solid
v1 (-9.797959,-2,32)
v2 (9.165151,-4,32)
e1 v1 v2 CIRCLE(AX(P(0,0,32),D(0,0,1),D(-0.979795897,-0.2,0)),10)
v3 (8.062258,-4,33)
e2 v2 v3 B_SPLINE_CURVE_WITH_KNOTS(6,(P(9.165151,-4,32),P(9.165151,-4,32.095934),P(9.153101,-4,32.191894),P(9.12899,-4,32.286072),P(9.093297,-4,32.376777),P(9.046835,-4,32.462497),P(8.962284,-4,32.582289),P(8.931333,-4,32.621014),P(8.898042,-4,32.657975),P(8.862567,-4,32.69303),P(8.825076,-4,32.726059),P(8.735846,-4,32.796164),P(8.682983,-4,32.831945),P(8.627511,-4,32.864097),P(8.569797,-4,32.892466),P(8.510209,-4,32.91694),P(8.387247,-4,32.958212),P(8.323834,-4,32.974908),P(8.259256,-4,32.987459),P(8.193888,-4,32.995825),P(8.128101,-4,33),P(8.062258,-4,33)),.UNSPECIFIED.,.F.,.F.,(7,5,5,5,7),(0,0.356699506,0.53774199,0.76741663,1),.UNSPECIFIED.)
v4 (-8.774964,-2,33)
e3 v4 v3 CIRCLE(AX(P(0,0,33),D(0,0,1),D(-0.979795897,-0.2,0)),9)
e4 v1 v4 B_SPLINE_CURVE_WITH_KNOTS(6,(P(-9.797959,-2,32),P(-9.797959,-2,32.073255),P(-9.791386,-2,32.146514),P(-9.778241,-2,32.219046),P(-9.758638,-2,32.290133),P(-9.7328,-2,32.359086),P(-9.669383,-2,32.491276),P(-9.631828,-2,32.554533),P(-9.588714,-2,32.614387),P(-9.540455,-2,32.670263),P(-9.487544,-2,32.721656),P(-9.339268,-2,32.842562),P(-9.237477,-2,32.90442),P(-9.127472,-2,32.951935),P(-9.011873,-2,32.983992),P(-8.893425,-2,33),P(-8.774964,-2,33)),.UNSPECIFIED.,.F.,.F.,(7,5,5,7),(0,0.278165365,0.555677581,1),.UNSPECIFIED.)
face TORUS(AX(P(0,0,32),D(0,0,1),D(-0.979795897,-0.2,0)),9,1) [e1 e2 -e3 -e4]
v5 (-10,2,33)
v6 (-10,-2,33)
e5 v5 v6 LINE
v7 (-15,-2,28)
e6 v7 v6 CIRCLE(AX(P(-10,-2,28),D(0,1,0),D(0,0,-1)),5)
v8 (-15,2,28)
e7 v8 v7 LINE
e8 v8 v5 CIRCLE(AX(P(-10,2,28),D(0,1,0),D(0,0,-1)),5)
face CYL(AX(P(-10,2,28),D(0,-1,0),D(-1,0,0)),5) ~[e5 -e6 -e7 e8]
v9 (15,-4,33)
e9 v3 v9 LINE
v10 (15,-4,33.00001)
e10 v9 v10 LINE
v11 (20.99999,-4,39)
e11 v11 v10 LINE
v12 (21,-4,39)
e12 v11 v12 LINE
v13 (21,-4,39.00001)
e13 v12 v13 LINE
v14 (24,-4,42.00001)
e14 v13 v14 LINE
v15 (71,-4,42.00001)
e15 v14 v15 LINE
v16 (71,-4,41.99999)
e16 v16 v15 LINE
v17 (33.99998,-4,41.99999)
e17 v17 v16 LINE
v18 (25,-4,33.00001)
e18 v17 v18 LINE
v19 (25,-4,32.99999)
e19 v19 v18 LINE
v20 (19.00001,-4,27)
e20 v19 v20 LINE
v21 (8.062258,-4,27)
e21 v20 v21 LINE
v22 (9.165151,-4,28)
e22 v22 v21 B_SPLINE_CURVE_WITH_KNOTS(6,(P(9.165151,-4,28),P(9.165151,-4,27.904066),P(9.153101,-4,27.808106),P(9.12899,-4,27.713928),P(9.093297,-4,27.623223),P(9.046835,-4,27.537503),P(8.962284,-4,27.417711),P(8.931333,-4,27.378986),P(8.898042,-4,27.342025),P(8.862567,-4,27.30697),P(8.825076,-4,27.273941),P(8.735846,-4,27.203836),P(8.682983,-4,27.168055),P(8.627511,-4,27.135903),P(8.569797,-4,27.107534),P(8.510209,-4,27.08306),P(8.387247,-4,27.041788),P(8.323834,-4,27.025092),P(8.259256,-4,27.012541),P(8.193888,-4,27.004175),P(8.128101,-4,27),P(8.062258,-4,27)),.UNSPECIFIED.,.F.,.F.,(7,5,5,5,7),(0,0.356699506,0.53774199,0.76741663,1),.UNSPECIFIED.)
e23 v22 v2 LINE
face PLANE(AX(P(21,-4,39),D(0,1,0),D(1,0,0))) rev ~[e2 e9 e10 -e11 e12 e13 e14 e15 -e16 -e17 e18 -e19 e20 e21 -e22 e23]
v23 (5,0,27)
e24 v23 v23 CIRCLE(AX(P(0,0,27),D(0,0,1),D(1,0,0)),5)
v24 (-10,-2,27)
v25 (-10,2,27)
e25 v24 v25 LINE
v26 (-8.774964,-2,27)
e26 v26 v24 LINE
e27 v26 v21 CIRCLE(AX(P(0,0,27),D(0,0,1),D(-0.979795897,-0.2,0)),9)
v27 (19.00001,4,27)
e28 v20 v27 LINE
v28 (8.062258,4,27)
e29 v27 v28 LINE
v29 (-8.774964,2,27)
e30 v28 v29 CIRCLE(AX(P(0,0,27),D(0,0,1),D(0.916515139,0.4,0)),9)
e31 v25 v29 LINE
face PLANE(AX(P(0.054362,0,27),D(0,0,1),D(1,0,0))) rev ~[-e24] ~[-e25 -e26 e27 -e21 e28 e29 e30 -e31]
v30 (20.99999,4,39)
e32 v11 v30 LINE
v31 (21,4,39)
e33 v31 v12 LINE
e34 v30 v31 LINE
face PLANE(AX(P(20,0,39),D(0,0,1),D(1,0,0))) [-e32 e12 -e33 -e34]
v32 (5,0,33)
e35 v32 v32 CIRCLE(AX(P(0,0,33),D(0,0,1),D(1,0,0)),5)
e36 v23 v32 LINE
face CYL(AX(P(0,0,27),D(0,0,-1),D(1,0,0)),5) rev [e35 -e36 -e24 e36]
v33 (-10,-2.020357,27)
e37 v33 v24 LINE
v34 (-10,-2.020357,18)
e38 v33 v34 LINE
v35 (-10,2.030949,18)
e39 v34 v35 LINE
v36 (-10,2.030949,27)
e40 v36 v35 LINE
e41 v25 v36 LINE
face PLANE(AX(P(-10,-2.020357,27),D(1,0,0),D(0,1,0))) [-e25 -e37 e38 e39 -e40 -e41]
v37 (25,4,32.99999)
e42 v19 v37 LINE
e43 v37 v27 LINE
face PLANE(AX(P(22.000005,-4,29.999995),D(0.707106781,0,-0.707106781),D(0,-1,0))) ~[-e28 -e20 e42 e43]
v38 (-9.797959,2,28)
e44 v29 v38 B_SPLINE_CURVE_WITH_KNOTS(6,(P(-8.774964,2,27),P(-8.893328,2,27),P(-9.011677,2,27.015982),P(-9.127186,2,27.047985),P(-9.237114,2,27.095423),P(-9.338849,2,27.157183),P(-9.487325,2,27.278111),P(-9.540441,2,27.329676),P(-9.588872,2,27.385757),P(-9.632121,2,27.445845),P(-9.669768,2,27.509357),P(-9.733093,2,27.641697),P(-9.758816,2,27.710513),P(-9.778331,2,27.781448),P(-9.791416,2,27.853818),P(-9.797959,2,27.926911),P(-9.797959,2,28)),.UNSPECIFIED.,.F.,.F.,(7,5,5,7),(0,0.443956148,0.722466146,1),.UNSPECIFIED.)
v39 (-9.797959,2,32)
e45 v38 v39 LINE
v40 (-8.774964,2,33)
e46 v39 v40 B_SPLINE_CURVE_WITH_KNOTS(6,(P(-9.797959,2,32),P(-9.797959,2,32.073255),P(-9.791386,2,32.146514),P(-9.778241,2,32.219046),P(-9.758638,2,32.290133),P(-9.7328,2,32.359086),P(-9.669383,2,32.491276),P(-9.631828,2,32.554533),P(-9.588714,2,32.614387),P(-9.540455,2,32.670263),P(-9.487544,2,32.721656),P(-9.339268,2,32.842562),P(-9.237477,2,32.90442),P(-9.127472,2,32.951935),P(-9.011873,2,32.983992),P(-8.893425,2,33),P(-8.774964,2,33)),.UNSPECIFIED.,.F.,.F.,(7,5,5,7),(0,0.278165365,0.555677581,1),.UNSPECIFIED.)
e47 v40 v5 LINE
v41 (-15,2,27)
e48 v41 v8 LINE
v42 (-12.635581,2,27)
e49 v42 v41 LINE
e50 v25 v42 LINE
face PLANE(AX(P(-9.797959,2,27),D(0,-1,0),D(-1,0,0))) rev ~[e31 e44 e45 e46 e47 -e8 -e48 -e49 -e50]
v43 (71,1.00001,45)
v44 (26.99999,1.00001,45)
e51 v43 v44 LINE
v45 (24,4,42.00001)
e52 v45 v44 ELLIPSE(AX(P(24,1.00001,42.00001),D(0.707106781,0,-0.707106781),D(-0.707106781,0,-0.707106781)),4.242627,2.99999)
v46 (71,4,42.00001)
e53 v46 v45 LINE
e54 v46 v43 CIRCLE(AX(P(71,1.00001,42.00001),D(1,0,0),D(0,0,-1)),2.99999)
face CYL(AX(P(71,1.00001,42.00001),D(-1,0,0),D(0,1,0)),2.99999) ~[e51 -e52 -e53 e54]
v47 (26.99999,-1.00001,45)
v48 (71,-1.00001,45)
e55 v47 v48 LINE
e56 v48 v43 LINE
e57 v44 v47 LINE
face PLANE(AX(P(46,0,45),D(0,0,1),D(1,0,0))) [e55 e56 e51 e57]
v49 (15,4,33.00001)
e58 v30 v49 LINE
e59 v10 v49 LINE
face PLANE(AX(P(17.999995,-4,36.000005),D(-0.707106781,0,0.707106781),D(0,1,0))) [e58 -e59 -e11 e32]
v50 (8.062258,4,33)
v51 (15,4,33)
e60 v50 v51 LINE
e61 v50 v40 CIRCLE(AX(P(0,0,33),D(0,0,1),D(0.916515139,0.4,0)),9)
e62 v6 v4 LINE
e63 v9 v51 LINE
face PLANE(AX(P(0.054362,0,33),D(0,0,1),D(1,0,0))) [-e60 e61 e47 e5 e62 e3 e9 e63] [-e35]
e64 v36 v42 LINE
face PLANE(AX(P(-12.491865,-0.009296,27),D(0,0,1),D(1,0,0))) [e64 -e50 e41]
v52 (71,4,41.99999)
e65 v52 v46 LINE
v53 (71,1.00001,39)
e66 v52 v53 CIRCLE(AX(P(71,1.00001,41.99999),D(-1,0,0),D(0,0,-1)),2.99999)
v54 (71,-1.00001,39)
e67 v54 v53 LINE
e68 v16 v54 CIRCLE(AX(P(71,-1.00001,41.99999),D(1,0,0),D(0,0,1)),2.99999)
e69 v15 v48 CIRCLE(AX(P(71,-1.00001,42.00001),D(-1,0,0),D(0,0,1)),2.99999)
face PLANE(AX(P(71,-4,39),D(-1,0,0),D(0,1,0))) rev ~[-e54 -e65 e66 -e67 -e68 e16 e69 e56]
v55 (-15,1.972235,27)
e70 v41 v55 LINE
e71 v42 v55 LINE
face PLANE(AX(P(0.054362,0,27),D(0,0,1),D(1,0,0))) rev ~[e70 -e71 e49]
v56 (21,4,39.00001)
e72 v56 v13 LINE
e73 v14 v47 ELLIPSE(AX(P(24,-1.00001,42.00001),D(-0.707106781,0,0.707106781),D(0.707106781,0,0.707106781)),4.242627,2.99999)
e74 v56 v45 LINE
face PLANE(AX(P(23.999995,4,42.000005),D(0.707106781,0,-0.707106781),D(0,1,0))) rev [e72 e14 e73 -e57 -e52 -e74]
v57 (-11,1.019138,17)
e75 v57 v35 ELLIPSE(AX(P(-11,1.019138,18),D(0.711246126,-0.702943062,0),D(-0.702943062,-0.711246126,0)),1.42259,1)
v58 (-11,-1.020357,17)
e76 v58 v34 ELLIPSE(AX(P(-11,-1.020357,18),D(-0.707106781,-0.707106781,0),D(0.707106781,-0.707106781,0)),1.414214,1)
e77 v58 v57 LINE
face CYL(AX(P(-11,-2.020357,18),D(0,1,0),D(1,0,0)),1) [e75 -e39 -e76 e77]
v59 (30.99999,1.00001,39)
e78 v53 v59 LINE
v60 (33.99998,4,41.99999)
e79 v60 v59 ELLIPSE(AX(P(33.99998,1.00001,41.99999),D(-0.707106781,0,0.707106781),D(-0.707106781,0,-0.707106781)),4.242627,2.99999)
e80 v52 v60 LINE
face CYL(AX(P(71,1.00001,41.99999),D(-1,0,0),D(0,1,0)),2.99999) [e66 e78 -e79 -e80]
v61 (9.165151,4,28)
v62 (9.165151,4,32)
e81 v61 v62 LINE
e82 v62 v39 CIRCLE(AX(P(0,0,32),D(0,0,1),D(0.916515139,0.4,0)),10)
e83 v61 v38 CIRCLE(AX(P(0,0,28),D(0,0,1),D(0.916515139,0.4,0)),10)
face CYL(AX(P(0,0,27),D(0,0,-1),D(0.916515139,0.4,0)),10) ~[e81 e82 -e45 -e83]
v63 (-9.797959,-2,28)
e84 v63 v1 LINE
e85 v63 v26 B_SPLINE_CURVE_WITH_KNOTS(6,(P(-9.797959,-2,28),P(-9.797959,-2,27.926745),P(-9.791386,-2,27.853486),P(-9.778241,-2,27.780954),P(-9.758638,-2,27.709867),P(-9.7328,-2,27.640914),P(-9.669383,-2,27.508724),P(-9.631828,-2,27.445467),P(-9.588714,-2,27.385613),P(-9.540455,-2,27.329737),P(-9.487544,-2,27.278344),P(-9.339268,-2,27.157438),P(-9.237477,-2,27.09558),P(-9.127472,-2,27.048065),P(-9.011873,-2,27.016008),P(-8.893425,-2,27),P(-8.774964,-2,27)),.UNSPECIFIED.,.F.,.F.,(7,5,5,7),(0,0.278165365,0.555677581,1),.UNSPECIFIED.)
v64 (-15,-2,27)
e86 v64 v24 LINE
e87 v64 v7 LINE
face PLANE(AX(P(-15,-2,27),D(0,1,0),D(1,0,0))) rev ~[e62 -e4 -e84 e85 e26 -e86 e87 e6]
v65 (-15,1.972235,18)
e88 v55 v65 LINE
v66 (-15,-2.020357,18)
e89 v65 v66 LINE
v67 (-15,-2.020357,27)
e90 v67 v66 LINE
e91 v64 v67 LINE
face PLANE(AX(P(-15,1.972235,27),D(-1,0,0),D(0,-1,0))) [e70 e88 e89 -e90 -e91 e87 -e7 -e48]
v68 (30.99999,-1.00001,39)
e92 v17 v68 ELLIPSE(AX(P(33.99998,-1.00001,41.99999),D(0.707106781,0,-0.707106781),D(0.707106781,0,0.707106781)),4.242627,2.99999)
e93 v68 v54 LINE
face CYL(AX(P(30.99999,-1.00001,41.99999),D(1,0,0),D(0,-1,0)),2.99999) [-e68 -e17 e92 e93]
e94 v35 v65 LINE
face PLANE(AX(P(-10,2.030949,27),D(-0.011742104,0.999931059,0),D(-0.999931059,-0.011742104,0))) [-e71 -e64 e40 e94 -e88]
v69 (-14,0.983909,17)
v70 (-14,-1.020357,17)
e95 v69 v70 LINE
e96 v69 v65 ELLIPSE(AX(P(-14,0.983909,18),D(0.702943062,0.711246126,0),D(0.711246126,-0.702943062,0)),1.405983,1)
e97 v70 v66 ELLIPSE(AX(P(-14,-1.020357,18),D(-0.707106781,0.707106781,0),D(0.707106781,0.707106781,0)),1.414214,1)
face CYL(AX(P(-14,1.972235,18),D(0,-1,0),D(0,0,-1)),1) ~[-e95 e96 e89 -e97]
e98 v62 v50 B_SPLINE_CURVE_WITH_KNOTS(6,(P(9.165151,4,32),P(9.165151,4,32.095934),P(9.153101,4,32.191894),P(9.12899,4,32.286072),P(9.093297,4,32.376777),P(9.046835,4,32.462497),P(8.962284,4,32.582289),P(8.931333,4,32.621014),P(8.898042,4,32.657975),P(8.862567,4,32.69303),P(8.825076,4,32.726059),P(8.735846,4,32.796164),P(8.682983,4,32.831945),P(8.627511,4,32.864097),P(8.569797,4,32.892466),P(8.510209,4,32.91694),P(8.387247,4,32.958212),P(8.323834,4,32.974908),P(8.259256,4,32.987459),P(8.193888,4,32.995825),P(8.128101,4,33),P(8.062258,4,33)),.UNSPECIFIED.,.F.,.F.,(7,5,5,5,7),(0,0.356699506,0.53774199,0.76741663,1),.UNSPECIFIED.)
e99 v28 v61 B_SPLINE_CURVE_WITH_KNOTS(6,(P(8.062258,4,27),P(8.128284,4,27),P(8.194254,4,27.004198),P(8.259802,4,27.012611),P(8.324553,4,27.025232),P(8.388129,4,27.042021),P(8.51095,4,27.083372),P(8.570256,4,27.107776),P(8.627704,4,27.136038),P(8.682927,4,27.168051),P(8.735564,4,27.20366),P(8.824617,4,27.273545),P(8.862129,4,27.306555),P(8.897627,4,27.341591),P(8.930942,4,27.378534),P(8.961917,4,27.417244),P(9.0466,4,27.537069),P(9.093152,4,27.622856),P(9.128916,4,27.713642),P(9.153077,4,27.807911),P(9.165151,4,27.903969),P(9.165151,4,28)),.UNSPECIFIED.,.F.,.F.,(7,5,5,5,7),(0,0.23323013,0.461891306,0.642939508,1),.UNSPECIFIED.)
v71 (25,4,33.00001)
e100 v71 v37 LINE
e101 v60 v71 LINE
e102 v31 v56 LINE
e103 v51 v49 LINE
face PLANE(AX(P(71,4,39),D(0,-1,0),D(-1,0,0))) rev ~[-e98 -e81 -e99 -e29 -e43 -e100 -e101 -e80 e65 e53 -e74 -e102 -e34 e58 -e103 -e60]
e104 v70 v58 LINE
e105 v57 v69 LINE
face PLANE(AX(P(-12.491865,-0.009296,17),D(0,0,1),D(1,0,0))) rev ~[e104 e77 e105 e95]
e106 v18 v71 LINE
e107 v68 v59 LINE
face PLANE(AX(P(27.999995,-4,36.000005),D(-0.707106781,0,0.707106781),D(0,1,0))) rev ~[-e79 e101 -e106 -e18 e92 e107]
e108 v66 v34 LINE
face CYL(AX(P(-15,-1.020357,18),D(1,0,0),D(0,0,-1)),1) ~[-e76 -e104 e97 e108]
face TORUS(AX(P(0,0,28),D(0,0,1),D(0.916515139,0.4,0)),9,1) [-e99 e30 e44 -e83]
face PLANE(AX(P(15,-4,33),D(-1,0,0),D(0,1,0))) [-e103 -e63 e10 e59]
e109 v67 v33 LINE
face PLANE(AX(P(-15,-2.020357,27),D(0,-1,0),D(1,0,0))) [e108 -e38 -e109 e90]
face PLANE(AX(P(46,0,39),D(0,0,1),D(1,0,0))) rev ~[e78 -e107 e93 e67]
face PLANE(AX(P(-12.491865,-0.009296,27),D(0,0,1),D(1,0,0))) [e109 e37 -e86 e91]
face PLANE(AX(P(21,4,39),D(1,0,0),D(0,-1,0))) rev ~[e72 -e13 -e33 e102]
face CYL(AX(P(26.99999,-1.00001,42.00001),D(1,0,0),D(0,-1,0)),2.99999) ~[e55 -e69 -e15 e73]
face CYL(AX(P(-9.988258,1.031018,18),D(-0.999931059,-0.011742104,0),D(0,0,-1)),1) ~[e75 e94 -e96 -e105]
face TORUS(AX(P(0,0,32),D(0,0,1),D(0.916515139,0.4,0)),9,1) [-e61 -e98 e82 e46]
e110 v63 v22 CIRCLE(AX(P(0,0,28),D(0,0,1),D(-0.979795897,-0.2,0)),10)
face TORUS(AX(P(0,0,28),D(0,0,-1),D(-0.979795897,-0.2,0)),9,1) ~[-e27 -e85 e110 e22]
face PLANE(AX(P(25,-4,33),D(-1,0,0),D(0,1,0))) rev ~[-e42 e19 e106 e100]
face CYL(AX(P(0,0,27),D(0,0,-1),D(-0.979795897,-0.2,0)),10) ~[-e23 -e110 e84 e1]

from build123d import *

# Parameters (mm, degrees)
F1_R     = 5
F2_DEPTH = 6
F4_DEPTH = 10
F5_R     = 5
F6_W     = 10
F6_H     = 8
F7_DEPTH = 6
F9_DEPTH = 6
F10_SIZE = 5.99999
F11_R    = 2.99999
F12_R    = 1
F13_R    = 1


# Not quite as in the source:
# - a fillet or chamfer is up to 0.001 mm smaller than in the source, because OpenCascade refuses the exact size


with BuildPart() as f2:
    # F1 (on offset) → F2 (new body)
    with BuildSketch(Plane.XY.offset(27)):
        with BuildLine():
            ThreePointArc((9.1651513899, -4), (9.7890631293, -2.0430964369), (10, 0))
            ThreePointArc((10, 0), (9.7890631293, 2.0430964369), (9.1651513899, 4))
            ThreePointArc((9.1651513899, 4), (-1.048861935, 9.9448423135), (-9.7979589711, 2))
            ThreePointArc((-9.7979589711, 2), (-9.9493615301, 1.0050896201), (-10, 0))
            ThreePointArc((-10, 0), (-9.9493615301, -1.0050896201), (-9.7979589711, -2))
            ThreePointArc((-9.7979589711, -2), (-1.048861935, -9.9448423135), (9.1651513899, -4))
        make_face()
        Circle(F1_R, mode=Mode.SUBTRACT)
        with BuildLine():
            Line((25, 0), (10, 0))
            ThreePointArc((10, 0), (9.7890631293, -2.0430964369), (9.1651513899, -4))
            Line((9.1651513899, -4), (25, -4))
            Line((25, -4), (25, 0))
        make_face()
        with BuildLine():
            ThreePointArc((9.1651513899, 4), (9.7890631293, 2.0430964369), (10, 0))
            Line((10, 0), (25, 0))
            Line((25, 0), (25, 4))
            Line((25, 4), (9.1651513899, 4))
        make_face()
        with BuildLine():
            ThreePointArc((-10, 0), (-9.9493615301, 1.0050896201), (-9.7979589711, 2))
            Line((-9.7979589711, 2), (-15, 2))
            Line((-15, 2), (-15, 0))
            Line((-15, 0), (-10, 0))
        make_face()
        with BuildLine():
            Line((-15, -2), (-9.7979589711, -2))
            ThreePointArc((-9.7979589711, -2), (-9.9493615301, -1.0050896201), (-10, 0))
            Line((-10, 0), (-15, 0))
            Line((-15, 0), (-15, -2))
        make_face()
    extrude(amount=F2_DEPTH)

    # F3 (on offset) → F4 (join)
    with BuildSketch(Plane.XY.offset(27)):
        Polygon((-10, -2.0203573131), (-10, 2.0309494015), (-15, 1.9722348321), (-15, -2.0203573131), align=None)
    extrude(amount=-F4_DEPTH)

    # F5
    f5_edges = [f2.edges().sort_by_distance(p)[0] for p in [
        (-15, 0, 33),
    ]]
    fillet(f5_edges, radius=F5_R)

    # F6 (on face) → F7 (join)
    with BuildSketch(Plane.XY.offset(33)):
        with Locations((20, 0)):
            Rectangle(F6_W, F6_H)
    extrude(amount=F7_DEPTH)

    # F8 (on face) → F9 (join)
    with BuildSketch(Plane.XY.offset(39)):
        Polygon((21, 4), (21, 0), (21, -4), (71, -4), (71, 4), align=None)
    extrude(amount=F9_DEPTH)

    # F10 (size 6 in the source; OpenCascade refuses exactly that, so slightly less here)
    f10_edges = [f2.edges().sort_by_distance(p)[0] for p in [
        (25, 0, 27),
        (15, 0, 39),
        (21, 0, 45),
        (25, 0, 39),
    ]]
    chamfer(f10_edges, length=F10_SIZE)

    # F11 (radius 3 in the source; OpenCascade refuses exactly that, so slightly less here)
    f11_edges = [f2.edges().sort_by_distance(p)[0] for p in [
        (48.999995, -4, 45),
        (50.999995, -4, 39),
        (50.999995, 4, 39),
        (48.999995, 4, 45),
    ]]
    fillet(f11_edges, radius=F11_R)

    # F12
    f12_edges = [f2.edges().sort_by_distance(p)[0] for p in [
        (-1.048862, -9.944842, 33),
        (-1.048862, -9.944842, 27),
        (-1.048862, 9.944842, 33),
        (-1.048862, 9.944842, 27),
    ]]
    fillet(f12_edges, radius=F12_R)

    # F13
    f13_edges = [f2.edges().sort_by_distance(p)[0] for p in [
        (-12.5, -2.020357, 17),
        (-15, -0.024061, 17),
        (-12.5, 2.001592, 17),
        (-10, 0.005296, 17),
    ]]
    fillet(f13_edges, radius=F13_R)


solid = f2.part
